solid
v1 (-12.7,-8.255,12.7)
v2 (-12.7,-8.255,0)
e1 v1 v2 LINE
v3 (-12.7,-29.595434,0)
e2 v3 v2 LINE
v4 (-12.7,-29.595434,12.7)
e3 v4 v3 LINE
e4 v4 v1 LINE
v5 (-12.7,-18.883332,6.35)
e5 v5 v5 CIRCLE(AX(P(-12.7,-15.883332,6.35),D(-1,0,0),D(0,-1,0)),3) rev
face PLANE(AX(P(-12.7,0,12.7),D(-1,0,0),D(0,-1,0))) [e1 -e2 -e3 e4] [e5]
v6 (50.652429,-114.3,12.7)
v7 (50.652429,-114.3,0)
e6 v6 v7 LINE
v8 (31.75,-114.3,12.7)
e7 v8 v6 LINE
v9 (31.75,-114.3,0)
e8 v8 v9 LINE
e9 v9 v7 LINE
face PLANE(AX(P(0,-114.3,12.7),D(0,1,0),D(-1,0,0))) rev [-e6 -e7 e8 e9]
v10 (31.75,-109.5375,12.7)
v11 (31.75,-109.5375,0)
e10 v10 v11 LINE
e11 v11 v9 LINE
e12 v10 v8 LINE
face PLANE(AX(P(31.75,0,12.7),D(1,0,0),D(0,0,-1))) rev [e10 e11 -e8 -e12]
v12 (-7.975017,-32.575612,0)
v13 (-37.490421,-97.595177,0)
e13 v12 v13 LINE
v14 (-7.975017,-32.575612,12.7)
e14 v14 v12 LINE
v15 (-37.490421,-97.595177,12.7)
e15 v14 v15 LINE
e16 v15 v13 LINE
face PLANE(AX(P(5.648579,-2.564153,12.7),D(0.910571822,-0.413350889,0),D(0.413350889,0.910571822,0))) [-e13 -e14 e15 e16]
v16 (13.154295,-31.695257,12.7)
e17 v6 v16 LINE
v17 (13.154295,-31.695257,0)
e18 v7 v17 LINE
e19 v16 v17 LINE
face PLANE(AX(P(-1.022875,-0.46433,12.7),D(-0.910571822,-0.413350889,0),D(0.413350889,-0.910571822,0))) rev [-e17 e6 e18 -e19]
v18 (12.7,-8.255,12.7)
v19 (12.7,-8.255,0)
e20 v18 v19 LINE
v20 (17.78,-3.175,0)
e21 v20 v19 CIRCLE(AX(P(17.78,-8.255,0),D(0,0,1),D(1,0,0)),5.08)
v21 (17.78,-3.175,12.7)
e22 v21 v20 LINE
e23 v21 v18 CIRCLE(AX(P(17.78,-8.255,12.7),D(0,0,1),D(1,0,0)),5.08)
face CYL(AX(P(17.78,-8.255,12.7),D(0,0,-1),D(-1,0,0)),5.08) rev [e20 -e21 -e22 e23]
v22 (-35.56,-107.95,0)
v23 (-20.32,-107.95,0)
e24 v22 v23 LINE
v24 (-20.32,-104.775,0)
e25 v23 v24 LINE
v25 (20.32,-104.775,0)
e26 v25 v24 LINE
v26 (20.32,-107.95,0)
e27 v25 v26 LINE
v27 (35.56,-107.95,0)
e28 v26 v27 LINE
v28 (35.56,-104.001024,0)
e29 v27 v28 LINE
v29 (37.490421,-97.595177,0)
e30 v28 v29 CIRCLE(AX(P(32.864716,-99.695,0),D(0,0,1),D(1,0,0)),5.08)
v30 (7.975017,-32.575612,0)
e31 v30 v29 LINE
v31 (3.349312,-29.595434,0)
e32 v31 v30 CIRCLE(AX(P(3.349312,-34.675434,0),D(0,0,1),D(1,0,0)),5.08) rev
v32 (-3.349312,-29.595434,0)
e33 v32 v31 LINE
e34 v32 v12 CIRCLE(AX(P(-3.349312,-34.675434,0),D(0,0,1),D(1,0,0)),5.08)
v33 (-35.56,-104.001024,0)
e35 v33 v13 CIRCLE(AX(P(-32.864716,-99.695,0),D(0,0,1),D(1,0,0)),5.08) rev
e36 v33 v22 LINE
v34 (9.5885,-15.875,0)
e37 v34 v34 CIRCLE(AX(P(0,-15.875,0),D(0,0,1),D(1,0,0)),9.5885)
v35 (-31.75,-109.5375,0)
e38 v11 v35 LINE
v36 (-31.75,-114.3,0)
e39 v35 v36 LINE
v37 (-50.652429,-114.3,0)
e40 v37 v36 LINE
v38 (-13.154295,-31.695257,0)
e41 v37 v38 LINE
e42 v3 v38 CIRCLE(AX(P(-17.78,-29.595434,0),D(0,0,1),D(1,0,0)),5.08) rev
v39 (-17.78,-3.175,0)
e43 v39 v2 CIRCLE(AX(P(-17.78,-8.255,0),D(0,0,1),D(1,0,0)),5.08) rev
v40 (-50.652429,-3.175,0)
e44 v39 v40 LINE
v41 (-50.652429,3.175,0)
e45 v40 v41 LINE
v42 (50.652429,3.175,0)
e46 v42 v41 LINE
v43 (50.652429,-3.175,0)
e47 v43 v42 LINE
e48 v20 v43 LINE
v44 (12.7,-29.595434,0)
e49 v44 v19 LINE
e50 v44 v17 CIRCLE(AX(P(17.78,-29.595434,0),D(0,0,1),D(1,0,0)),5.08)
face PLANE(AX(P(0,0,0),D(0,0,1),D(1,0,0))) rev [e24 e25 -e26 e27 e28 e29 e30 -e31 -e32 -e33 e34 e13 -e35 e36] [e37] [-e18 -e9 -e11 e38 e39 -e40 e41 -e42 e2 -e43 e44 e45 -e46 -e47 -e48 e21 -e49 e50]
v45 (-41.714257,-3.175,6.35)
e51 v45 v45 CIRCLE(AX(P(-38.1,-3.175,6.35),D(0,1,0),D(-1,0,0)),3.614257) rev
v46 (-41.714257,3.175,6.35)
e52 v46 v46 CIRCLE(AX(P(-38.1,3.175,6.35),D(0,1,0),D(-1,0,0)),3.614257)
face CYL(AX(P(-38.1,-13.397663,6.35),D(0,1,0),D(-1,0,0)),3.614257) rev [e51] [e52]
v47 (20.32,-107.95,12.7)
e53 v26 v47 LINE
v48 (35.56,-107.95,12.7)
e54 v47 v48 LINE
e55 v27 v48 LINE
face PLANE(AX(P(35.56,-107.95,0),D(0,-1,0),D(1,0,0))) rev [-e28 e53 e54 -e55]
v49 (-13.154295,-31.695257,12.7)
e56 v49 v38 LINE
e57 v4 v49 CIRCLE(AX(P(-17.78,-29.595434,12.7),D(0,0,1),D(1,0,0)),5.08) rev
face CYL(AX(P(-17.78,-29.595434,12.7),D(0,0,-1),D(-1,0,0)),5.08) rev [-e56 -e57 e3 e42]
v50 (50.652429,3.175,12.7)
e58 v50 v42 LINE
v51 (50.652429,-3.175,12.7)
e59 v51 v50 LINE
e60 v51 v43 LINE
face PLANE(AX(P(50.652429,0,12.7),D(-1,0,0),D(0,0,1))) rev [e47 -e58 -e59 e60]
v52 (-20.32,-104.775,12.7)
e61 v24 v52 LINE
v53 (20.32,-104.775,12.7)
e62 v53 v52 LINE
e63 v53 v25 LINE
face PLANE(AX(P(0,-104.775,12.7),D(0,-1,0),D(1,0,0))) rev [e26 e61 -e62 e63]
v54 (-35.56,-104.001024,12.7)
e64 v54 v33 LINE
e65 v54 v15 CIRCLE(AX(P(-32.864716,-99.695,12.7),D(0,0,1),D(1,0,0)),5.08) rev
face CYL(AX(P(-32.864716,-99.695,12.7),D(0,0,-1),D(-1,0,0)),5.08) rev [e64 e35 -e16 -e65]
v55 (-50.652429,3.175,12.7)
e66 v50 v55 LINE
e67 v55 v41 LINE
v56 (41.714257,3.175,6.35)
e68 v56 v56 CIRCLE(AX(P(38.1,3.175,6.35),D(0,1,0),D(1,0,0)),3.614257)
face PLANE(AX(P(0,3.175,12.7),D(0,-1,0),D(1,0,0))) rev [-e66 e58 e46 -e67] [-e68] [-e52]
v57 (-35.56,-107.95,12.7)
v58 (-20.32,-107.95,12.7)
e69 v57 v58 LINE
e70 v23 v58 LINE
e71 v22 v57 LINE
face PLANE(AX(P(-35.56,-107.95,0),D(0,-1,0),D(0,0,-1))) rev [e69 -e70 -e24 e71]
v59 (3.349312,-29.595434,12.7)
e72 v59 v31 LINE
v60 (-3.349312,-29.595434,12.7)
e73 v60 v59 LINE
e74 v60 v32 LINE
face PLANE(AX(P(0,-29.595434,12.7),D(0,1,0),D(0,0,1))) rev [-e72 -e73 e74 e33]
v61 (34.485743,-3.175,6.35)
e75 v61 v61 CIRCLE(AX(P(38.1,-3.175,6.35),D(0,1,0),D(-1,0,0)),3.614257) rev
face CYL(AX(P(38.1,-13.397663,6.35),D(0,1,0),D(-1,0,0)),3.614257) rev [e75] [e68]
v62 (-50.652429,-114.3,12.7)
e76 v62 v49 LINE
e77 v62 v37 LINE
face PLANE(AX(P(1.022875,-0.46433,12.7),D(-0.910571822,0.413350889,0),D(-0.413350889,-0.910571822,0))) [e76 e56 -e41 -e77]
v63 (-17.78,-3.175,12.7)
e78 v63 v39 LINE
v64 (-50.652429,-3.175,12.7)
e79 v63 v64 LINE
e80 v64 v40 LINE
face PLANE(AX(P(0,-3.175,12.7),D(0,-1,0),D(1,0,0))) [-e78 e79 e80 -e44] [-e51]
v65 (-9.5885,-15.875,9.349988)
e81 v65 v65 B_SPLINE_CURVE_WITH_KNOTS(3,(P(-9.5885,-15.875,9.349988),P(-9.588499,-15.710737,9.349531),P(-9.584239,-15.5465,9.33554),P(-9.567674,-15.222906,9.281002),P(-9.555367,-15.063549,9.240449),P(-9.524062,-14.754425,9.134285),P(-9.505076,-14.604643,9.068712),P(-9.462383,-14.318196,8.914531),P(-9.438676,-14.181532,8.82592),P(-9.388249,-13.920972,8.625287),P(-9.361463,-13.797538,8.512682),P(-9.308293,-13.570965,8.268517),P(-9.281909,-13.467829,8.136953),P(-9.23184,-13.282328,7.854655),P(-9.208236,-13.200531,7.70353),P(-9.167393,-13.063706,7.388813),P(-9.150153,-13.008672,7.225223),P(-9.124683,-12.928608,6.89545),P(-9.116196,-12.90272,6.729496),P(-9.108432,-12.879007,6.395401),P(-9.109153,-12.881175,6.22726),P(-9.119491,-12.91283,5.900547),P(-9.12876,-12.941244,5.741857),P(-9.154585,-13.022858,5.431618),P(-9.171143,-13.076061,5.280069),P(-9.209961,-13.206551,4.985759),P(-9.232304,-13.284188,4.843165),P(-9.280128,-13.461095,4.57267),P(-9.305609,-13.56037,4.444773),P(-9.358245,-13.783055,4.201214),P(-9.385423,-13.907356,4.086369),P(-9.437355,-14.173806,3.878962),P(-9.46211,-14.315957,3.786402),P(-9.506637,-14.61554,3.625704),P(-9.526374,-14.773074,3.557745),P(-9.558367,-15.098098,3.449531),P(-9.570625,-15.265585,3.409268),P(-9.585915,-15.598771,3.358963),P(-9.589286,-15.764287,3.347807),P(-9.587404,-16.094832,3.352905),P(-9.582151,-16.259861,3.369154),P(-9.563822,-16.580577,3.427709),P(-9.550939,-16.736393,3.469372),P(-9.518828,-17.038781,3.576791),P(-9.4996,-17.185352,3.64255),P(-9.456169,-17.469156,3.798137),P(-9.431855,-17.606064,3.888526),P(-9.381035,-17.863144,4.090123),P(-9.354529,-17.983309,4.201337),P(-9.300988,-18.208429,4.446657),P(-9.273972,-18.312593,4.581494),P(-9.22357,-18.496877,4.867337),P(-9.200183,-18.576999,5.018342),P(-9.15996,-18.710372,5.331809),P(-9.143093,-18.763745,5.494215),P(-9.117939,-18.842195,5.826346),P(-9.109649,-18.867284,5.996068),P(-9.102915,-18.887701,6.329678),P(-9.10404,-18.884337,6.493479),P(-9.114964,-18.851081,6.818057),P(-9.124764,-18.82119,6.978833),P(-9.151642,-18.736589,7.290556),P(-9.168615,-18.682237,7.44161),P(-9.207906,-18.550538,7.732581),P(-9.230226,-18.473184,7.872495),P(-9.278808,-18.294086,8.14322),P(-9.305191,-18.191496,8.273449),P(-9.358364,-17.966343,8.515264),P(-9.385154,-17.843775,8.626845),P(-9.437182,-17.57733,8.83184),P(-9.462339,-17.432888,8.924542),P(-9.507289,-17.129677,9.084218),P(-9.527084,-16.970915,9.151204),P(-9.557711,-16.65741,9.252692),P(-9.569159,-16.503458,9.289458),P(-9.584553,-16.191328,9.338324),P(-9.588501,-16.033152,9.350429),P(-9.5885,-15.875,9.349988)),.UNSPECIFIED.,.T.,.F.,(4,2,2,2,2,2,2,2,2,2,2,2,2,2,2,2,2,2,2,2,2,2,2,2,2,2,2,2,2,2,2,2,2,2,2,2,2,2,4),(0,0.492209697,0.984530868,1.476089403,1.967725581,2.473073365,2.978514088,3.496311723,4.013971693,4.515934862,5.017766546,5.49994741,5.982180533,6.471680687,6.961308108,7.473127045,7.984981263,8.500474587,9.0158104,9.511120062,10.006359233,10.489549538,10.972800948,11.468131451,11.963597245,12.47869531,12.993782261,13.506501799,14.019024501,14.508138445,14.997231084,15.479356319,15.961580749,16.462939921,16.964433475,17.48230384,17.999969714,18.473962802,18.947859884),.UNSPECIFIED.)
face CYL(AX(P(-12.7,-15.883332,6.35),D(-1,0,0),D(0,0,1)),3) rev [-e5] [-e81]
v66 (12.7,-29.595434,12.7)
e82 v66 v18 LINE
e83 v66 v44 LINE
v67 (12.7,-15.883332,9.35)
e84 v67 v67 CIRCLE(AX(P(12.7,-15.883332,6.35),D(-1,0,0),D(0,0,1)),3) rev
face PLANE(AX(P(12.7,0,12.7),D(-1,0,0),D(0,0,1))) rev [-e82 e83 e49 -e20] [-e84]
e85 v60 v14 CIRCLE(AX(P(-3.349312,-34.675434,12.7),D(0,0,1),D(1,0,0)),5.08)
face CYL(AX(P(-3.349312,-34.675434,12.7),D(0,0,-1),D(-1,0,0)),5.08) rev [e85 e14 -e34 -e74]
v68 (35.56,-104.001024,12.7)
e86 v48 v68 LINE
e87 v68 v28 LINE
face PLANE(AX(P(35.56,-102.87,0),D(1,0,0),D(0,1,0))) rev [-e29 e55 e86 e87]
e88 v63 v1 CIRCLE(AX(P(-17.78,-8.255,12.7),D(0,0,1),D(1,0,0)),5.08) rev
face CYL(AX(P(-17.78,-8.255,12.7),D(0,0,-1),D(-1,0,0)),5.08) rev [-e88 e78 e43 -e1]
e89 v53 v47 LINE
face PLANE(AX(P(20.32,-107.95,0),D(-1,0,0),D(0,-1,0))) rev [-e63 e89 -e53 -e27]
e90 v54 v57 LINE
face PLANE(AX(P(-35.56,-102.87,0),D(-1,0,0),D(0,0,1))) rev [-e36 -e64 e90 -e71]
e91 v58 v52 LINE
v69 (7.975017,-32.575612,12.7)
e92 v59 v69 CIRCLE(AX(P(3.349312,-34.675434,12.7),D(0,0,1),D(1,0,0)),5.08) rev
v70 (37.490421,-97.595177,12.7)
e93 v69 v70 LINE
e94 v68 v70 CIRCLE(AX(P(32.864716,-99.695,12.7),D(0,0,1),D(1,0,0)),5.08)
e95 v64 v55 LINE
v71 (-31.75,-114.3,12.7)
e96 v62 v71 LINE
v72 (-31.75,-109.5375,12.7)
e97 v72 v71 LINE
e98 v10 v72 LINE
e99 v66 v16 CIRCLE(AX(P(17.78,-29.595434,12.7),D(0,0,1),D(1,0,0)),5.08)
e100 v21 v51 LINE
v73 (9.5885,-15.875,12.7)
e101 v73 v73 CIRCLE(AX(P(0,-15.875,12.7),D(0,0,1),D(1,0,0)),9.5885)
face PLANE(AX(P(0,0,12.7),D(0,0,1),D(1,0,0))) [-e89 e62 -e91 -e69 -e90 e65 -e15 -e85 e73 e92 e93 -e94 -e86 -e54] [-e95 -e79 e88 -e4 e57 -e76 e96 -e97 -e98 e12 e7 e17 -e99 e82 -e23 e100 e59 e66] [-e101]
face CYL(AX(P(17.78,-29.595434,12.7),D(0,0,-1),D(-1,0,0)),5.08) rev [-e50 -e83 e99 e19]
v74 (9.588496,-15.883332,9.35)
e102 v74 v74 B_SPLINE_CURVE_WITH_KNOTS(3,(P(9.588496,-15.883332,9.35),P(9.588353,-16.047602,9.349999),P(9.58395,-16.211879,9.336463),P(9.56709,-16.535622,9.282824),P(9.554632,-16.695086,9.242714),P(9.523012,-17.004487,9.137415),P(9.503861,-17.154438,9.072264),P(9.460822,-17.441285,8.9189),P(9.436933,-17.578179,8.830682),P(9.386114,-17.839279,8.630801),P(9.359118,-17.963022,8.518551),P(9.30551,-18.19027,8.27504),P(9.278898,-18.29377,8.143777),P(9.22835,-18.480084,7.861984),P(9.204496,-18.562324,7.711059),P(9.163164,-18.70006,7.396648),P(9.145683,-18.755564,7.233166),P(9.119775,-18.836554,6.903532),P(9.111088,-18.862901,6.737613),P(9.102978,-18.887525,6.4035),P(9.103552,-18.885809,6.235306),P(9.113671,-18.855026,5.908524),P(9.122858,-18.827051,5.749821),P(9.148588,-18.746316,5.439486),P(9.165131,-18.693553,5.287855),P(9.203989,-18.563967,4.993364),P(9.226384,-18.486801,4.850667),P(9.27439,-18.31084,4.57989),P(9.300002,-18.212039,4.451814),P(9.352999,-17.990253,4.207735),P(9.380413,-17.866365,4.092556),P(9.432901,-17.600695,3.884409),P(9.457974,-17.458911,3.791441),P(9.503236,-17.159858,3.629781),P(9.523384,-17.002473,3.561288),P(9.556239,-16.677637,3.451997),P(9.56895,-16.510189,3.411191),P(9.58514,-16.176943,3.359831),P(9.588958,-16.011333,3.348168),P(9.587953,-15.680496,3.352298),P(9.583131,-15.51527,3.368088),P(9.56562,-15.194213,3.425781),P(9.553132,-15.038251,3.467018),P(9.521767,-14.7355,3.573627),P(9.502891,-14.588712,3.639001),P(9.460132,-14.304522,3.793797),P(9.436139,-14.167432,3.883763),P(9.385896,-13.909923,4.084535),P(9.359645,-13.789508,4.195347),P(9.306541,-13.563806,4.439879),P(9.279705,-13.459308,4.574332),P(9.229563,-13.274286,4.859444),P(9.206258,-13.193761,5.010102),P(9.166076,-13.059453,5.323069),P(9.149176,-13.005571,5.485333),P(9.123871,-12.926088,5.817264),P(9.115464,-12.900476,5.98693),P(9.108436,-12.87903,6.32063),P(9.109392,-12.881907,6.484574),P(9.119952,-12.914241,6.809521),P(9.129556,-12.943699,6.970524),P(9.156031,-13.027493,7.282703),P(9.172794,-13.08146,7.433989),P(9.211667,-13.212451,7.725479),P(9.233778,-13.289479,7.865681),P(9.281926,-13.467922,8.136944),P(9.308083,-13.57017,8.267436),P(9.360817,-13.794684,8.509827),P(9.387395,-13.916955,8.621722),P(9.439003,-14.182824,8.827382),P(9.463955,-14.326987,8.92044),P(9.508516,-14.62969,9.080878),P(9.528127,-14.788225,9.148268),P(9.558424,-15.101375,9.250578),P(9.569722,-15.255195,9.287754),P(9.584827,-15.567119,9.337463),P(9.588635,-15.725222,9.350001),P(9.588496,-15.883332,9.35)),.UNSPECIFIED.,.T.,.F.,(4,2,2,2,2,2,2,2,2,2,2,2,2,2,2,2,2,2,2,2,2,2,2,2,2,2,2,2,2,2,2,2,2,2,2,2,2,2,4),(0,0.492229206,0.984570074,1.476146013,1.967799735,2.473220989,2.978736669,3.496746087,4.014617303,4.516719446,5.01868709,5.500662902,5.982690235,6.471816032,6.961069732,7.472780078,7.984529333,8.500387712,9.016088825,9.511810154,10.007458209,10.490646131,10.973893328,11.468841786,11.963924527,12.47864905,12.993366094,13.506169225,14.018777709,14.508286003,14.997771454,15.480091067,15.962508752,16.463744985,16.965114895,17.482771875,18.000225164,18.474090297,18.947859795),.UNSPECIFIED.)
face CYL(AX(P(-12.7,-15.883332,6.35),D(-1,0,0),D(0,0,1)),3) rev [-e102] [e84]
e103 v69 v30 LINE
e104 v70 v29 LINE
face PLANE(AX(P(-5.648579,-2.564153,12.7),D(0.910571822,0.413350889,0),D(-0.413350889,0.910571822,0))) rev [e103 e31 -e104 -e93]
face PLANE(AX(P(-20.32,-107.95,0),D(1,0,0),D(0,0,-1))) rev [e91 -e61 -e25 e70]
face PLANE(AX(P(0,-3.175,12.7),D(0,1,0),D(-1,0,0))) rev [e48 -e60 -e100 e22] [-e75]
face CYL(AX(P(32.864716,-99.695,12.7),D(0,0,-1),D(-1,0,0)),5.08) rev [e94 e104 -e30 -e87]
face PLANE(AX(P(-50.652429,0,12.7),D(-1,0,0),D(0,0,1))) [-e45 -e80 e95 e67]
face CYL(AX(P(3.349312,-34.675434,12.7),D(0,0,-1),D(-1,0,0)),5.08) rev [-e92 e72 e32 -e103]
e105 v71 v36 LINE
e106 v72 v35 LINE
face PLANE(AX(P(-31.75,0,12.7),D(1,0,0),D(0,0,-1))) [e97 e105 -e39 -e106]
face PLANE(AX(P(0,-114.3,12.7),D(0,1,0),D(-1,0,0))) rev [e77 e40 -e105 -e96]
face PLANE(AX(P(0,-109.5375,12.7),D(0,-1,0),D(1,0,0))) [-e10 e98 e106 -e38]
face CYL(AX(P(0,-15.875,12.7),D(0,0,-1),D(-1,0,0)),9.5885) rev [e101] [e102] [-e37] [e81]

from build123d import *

# Parameters (mm, degrees)
SKETCH3_R               = 9.5885
BOSS_EXTRUDE1_DEPTH     = 12.7
SKETCH4_R               = 3.614257139
CUT_EXTRUDE1_DEPTH      = 6.35
CUT_EXTRUDE2_START      = -12.7
CUT_EXTRUDE2_OUTLINE_R  = 3
CUT_EXTRUDE2_DEPTH      = 25.4
CUT_EXTRUDE3_DEPTH      = 126.664030474
CUT_EXTRUDE3_DEPTH_BACK = 126.664030474
SKETCH8_W               = 15.24
SKETCH8_H               = 5.08


# Read off the part's stored shape, not the designer's step: Cut-Extrude2
with BuildPart() as part:
    # Sketch3 → Boss-Extrude1 (new body)
    with BuildSketch(Plane.XY):
        with BuildLine():
            Line((50.652428891, 3.175), (-50.652428891, 3.175))
            Line((-50.652428891, 3.175), (-50.652428891, -3.175))
            Line((-50.652428891, -3.175), (-17.78, -3.175))
            ThreePointArc((-17.78, -3.175), (-14.187897552, -4.662897552), (-12.7, -8.255))
            Line((-12.7, -8.255), (-12.7, -29.595434395))
            ThreePointArc((-12.7, -29.595434395), (-12.814872576, -30.66963627), (-13.154295145, -31.69525691))
            Line((-13.154295145, -31.69525691), (-50.652428891, -114.3))
            Line((-50.652428891, -114.3), (-31.75, -114.3))
            Line((-31.75, -114.3), (-31.75, -109.5375))
            Line((-31.75, -109.5375), (31.75, -109.5375))
            Line((31.75, -109.5375), (31.75, -114.3))
            Line((31.75, -114.3), (50.652428891, -114.3))
            Line((50.652428891, -114.3), (13.154295145, -31.69525691))
            ThreePointArc((13.154295145, -31.69525691), (12.814872576, -30.66963627), (12.7, -29.595434395))
            Line((12.7, -29.595434395), (12.7, -8.255))
            ThreePointArc((12.7, -8.255), (14.187897552, -4.662897552), (17.78, -3.175))
            Line((17.78, -3.175), (50.652428891, -3.175))
            Line((50.652428891, -3.175), (50.652428891, 3.175))
        make_face()
        with Locations((0, -15.875)):
            Circle(SKETCH3_R, mode=Mode.SUBTRACT)
        with BuildLine():
            Line((-7.97501727, -32.575611881), (-37.490421301, -97.595177486))
            ThreePointArc((-37.490421301, -97.595177486), (-37.135167146, -102.446299841), (-32.864716446, -104.775))
            Line((-32.864716446, -104.775), (0, -104.775))
            Line((0, -104.775), (32.864716446, -104.775))
            ThreePointArc((32.864716446, -104.775), (37.135167146, -102.446299841), (37.490421301, -97.595177486))
            Line((37.490421301, -97.595177486), (7.97501727, -32.575611881))
            ThreePointArc((7.97501727, -32.575611881), (6.100612256, -30.404983695), (3.349312415, -29.595434395))
            Line((3.349312415, -29.595434395), (-3.349312415, -29.595434395))
            ThreePointArc((-3.349312415, -29.595434395), (-6.100612256, -30.404983695), (-7.97501727, -32.575611881))
        make_face(mode=Mode.SUBTRACT)
    extrude(amount=BOSS_EXTRUDE1_DEPTH)

    # Sketch4 → Cut-Extrude1 (cut)
    with BuildSketch(Plane(origin=(0, 3.175, 0), x_dir=(1, 0, 0), z_dir=(0, 1, 0))):
        with Locations(Location((-38.1, -6.35, 0), (0, 0, 180))):
            Circle(SKETCH4_R)
        with Locations(Location((38.1, -6.35, 0), (0, 0, 180))):
            Circle(SKETCH4_R)
    extrude(amount=-CUT_EXTRUDE1_DEPTH, mode=Mode.SUBTRACT)

    # Cut-Extrude2 outline → Cut-Extrude2 (cut)
    with BuildSketch(Plane.YZ.offset(CUT_EXTRUDE2_START)):
        with Locations((-15.883331584, 6.35)):
            Circle(CUT_EXTRUDE2_OUTLINE_R)
    extrude(amount=CUT_EXTRUDE2_DEPTH, mode=Mode.SUBTRACT)

    # Sketch8 → Cut-Extrude3 (cut, two sides: drawn at the far end of the back side and taken through both)
    with BuildSketch(Plane.XY.offset(12.7).offset(-CUT_EXTRUDE3_DEPTH_BACK)):
        with Locations((-27.94, -105.41)):
            Rectangle(SKETCH8_W, SKETCH8_H)
        with Locations((27.94, -105.41)):
            Rectangle(SKETCH8_W, SKETCH8_H)
    extrude(amount=CUT_EXTRUDE3_DEPTH + CUT_EXTRUDE3_DEPTH_BACK, mode=Mode.SUBTRACT)


solid = part.part
